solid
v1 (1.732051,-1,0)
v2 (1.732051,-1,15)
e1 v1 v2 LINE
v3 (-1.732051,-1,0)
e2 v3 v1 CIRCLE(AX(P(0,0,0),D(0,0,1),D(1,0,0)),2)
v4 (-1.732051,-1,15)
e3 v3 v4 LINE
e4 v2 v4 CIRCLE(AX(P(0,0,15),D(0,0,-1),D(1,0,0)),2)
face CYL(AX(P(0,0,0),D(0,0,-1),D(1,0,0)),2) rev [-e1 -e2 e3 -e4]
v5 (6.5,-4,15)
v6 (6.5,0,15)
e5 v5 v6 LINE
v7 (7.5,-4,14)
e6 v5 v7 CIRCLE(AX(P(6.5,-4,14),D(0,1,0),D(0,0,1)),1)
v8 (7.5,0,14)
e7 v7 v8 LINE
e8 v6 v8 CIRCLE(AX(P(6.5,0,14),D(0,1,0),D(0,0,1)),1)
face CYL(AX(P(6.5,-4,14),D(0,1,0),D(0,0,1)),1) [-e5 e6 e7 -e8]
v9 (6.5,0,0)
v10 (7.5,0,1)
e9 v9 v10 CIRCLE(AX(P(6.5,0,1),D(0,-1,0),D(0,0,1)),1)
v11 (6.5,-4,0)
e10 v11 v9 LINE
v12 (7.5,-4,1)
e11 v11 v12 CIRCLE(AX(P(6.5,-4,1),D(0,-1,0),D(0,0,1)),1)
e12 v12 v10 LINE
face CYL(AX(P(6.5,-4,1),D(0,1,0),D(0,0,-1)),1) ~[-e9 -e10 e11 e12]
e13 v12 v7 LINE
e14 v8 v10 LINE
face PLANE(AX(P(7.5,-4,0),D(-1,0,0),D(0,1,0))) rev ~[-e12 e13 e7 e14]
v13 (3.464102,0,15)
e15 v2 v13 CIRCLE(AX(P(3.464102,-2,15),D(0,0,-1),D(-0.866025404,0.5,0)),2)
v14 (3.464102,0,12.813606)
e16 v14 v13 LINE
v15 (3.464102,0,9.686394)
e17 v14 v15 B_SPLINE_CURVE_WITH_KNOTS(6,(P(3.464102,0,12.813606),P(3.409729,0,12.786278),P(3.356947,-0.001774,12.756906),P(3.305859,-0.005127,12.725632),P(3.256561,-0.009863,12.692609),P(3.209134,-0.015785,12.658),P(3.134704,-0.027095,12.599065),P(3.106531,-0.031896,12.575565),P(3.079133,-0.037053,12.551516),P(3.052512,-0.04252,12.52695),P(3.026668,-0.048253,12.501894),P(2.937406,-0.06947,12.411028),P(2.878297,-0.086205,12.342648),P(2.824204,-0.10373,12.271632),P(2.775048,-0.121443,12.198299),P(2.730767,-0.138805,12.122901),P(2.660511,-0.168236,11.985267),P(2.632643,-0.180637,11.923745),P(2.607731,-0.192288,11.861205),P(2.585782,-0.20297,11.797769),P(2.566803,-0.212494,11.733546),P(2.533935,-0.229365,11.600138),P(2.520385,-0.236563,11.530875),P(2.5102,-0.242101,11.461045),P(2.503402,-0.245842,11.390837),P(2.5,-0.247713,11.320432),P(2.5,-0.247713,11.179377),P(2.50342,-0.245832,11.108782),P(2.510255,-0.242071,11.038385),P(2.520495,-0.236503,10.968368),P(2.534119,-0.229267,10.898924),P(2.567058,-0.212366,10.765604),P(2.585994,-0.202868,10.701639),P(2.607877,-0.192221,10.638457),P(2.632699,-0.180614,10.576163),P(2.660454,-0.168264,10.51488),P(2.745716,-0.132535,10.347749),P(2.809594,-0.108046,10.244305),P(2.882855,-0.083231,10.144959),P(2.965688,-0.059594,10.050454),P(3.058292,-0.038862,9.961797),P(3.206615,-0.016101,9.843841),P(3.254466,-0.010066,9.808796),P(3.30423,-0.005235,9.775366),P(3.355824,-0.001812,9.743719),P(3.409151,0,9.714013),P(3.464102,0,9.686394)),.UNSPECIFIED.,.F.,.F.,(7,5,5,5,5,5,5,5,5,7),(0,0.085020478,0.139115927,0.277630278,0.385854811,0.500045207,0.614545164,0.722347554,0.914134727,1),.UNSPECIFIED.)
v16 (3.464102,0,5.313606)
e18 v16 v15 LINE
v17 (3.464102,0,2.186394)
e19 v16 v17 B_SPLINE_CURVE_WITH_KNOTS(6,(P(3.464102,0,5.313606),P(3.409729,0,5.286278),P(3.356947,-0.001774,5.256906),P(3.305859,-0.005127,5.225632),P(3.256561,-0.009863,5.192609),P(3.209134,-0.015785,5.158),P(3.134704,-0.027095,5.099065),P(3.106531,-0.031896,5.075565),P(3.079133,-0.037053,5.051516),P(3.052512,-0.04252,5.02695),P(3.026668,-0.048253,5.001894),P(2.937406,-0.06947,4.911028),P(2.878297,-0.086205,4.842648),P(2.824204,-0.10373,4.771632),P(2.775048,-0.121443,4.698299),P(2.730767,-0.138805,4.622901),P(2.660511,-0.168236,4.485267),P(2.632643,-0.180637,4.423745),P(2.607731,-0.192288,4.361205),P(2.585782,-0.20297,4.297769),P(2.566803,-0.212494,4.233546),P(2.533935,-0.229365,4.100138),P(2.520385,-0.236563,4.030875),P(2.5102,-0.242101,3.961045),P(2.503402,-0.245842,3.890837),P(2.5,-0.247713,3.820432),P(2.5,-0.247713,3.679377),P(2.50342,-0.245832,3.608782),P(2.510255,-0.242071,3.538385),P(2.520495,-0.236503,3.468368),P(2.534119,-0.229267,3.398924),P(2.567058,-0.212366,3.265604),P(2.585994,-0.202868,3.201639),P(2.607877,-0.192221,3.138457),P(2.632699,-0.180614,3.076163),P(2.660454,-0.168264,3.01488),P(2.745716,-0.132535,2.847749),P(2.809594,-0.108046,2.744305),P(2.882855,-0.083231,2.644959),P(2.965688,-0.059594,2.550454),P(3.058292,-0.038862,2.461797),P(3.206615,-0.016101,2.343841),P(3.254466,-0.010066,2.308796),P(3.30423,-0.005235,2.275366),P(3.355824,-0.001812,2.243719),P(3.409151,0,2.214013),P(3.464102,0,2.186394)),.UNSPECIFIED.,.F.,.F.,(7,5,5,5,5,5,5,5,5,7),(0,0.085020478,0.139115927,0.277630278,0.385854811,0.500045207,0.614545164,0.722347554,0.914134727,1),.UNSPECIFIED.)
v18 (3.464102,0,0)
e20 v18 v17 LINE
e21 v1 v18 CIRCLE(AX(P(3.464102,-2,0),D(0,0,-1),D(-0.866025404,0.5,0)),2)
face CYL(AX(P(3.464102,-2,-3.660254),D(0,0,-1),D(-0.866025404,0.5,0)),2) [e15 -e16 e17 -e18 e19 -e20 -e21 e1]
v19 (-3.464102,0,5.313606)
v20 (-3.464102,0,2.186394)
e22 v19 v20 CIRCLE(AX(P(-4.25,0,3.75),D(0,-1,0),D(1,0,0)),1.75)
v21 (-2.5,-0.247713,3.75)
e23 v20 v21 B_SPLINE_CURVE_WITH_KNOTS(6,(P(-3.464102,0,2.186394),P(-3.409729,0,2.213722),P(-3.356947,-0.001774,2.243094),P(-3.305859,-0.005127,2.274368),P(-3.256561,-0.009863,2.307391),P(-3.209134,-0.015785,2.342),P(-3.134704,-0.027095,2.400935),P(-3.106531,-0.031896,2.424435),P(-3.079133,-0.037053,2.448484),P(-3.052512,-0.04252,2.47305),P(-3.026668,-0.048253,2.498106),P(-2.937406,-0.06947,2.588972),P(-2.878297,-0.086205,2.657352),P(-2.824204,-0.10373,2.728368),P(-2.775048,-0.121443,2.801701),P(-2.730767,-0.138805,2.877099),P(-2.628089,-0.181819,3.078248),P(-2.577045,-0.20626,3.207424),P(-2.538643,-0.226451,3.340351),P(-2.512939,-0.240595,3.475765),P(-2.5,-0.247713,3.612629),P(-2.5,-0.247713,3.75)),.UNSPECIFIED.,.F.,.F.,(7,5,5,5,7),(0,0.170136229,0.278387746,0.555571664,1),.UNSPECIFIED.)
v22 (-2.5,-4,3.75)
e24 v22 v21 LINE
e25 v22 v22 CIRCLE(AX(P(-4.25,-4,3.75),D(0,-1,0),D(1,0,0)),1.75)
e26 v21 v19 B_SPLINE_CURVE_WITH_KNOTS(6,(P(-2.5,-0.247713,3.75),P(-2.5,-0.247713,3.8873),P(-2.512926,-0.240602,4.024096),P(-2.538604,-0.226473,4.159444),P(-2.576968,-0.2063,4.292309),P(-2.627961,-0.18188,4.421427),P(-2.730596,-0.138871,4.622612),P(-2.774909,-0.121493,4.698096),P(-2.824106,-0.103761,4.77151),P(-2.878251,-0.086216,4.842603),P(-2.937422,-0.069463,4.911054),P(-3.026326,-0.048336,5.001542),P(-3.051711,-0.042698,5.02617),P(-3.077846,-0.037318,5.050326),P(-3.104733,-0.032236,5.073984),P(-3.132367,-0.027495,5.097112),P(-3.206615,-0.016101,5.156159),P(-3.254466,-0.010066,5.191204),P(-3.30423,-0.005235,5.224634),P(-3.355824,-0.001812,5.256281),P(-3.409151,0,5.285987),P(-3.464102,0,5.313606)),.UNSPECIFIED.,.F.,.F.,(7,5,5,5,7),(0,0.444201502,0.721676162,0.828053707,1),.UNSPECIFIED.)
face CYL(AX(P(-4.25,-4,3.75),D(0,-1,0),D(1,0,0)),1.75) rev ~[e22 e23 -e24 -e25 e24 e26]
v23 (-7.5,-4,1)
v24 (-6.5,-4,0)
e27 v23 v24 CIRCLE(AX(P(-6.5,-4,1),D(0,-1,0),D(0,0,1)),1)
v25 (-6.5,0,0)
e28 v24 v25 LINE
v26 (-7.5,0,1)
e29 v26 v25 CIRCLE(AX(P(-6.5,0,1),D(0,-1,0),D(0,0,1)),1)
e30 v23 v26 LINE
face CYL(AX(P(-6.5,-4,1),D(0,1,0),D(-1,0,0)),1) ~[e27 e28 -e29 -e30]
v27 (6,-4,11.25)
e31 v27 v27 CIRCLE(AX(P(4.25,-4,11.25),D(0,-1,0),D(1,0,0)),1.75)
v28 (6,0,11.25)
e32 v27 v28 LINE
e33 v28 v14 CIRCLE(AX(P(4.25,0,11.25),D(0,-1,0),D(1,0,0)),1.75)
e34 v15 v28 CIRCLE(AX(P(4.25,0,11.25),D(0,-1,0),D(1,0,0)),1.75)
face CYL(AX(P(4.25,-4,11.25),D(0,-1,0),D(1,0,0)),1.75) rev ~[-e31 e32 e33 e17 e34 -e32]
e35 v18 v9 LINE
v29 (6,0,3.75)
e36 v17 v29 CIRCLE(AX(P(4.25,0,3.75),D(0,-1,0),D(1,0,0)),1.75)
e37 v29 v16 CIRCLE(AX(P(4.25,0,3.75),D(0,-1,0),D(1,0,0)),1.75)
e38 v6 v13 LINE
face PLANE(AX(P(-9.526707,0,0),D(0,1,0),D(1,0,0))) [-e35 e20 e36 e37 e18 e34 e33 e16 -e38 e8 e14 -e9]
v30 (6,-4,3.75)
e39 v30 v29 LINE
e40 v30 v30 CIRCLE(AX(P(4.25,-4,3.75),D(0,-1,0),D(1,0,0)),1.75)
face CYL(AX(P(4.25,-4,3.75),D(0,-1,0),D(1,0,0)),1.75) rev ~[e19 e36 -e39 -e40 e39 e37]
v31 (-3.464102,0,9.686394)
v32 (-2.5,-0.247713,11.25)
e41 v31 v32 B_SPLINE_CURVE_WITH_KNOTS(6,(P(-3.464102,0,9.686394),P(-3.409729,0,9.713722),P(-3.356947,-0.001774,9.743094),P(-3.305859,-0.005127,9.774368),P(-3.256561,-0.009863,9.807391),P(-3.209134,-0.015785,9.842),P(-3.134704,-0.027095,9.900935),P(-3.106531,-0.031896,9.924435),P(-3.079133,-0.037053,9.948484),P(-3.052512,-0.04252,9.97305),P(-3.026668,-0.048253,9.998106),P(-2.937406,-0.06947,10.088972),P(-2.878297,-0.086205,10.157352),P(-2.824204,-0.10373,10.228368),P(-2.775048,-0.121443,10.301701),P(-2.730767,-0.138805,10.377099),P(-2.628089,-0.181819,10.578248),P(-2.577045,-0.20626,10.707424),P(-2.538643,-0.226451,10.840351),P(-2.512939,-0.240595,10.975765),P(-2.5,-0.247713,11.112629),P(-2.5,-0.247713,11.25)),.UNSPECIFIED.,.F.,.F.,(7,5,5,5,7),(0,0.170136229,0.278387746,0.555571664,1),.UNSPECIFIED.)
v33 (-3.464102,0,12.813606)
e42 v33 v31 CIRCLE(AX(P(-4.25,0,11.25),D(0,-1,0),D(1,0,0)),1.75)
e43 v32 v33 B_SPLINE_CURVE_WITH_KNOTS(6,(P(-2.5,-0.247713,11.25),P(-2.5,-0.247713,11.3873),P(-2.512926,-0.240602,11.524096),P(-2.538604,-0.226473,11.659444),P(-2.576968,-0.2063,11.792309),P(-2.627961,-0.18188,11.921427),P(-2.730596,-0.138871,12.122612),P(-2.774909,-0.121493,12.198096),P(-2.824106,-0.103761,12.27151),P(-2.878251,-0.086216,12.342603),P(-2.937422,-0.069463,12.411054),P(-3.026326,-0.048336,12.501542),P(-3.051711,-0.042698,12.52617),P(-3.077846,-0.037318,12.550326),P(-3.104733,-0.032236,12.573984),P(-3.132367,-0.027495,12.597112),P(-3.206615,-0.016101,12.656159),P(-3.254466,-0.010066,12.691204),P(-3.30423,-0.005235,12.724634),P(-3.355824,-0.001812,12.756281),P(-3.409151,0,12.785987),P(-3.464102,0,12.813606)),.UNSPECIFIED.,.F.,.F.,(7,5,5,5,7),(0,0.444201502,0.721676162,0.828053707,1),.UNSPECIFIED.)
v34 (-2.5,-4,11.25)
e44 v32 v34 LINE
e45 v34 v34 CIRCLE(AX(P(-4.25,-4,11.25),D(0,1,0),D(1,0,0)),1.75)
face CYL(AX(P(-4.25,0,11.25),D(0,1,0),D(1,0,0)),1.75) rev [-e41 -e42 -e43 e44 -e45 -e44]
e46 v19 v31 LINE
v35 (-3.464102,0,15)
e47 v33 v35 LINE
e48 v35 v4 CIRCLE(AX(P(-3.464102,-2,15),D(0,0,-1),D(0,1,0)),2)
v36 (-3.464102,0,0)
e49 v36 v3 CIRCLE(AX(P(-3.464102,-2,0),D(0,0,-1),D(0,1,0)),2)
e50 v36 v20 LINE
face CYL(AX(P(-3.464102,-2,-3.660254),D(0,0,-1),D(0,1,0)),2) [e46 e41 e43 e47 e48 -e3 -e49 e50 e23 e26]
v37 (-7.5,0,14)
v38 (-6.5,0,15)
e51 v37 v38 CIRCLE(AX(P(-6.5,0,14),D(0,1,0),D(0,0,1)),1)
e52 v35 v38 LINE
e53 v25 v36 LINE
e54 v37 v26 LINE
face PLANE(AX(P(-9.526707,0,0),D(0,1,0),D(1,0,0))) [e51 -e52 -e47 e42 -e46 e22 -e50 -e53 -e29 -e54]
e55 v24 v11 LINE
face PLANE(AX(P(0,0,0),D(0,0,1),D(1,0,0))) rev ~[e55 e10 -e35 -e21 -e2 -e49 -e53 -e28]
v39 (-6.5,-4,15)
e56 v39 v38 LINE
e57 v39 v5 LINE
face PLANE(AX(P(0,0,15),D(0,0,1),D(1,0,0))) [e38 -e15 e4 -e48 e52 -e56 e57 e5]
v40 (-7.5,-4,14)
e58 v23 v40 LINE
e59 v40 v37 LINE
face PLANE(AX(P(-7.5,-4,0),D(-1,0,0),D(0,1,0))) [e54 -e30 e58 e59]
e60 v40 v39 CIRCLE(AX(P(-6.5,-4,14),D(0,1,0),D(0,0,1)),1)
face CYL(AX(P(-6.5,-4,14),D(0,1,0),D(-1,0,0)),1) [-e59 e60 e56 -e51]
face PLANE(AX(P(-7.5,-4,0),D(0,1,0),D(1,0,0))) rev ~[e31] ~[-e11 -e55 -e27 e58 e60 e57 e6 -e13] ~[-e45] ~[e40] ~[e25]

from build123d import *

# Parameters (mm, degrees)
F0_W         = 15
F0_H         = 8
F2_DEPTH     = 15
F1_R         = 2
F3_DEPTH     = 20
F4_R         = 1.75
F5_DEPTH     = 15
F6_DEPTH     = 25
F8_R         = 1.75
F9_DEPTH     = 25
F10_R        = 1.75
F11_DEPTH    = 25
F7_W         = 19.053414464
F7_H         = 8.769848384
F12_DEPTH    = 25
F13_T1_DEPTH = 22.3205080757
F14_R        = 1


# Not quite as in the source:
# - a fillet or chamfer that OpenCascade refuses, or shapes differently, is made with other operations: its cross-section is extruded or revolved along the edge and cut away or added


with BuildPart() as f2:
    # F0 (on Top) → F2 (new body)
    with BuildSketch(Plane.XY):
        Rectangle(F0_W, F0_H)
    extrude(amount=F2_DEPTH)

    # F1 (on Top) → F3 (cut)
    with BuildSketch(Plane.XY):
        Circle(F1_R)
    extrude(amount=F3_DEPTH, mode=Mode.SUBTRACT)

    # F4 (on Front) → F5 (cut)
    with BuildSketch(Plane.XZ):
        with Locations((-4.25, 11.25)):
            Circle(F4_R)
    extrude(amount=F5_DEPTH, mode=Mode.SUBTRACT)

    # F4 (on Front) → F6 (cut)
    with BuildSketch(Plane.XZ):
        with Locations((-4.25, 11.25)):
            Circle(F4_R)
    extrude(amount=-F6_DEPTH, mode=Mode.SUBTRACT)

    # F8 (on face) → F9 (cut)
    with BuildSketch(Plane.XZ.offset(4)):
        with Locations((-4.25, 3.75)):
            Circle(F8_R)
    extrude(amount=-F9_DEPTH, mode=Mode.SUBTRACT)

    # F10 (on face) → F11 (cut)
    with BuildSketch(Plane.XZ.offset(4)):
        with Locations((4.25, 11.25)):
            Circle(F10_R)
        with Locations((4.25, 3.75)):
            Circle(F10_R)
    extrude(amount=-F11_DEPTH, mode=Mode.SUBTRACT)

    # F7 (on Top) → F12 (cut)
    with BuildSketch(Plane.XY):
        with Locations((0, 4.384924192)):
            Rectangle(F7_W, F7_H)
    extrude(amount=F12_DEPTH, mode=Mode.SUBTRACT)

    # F13: fillet of radius 2 on 2 edges, made by hand

    # F13_s2 → F13_t1 (cut)
    with BuildSketch(Plane.XY.offset(-3.6602540378)):
        with BuildLine():
            ThreePointArc((1.7320508076, -1), (2.4641016151, -0.2679491924), (3.4641016151, 0))
            Line((3.4641016151, 0), (2, 0))
            ThreePointArc((2, 0), (1.9318516526, -0.5176380902), (1.7320508076, -1))
        make_face()
        with BuildLine():
            ThreePointArc((-3.4641016151, 0), (-2.4641016151, -0.2679491924), (-1.7320508076, -1))
            ThreePointArc((-1.7320508076, -1), (-1.9318516526, -0.5176380902), (-2, 0))
            Line((-2, 0), (-3.4641016151, 0))
        make_face()
    extrude(amount=F13_T1_DEPTH, mode=Mode.SUBTRACT)

    # F14
    f14_edges = [f2.edges().sort_by_distance(p)[0] for p in [
        (-7.5, -2, 15),
        (-7.5, -2, 0),
        (7.5, -2, 15),
        (7.5, -2, 0),
    ]]
    fillet(f14_edges, radius=F14_R)


solid = f2.part
